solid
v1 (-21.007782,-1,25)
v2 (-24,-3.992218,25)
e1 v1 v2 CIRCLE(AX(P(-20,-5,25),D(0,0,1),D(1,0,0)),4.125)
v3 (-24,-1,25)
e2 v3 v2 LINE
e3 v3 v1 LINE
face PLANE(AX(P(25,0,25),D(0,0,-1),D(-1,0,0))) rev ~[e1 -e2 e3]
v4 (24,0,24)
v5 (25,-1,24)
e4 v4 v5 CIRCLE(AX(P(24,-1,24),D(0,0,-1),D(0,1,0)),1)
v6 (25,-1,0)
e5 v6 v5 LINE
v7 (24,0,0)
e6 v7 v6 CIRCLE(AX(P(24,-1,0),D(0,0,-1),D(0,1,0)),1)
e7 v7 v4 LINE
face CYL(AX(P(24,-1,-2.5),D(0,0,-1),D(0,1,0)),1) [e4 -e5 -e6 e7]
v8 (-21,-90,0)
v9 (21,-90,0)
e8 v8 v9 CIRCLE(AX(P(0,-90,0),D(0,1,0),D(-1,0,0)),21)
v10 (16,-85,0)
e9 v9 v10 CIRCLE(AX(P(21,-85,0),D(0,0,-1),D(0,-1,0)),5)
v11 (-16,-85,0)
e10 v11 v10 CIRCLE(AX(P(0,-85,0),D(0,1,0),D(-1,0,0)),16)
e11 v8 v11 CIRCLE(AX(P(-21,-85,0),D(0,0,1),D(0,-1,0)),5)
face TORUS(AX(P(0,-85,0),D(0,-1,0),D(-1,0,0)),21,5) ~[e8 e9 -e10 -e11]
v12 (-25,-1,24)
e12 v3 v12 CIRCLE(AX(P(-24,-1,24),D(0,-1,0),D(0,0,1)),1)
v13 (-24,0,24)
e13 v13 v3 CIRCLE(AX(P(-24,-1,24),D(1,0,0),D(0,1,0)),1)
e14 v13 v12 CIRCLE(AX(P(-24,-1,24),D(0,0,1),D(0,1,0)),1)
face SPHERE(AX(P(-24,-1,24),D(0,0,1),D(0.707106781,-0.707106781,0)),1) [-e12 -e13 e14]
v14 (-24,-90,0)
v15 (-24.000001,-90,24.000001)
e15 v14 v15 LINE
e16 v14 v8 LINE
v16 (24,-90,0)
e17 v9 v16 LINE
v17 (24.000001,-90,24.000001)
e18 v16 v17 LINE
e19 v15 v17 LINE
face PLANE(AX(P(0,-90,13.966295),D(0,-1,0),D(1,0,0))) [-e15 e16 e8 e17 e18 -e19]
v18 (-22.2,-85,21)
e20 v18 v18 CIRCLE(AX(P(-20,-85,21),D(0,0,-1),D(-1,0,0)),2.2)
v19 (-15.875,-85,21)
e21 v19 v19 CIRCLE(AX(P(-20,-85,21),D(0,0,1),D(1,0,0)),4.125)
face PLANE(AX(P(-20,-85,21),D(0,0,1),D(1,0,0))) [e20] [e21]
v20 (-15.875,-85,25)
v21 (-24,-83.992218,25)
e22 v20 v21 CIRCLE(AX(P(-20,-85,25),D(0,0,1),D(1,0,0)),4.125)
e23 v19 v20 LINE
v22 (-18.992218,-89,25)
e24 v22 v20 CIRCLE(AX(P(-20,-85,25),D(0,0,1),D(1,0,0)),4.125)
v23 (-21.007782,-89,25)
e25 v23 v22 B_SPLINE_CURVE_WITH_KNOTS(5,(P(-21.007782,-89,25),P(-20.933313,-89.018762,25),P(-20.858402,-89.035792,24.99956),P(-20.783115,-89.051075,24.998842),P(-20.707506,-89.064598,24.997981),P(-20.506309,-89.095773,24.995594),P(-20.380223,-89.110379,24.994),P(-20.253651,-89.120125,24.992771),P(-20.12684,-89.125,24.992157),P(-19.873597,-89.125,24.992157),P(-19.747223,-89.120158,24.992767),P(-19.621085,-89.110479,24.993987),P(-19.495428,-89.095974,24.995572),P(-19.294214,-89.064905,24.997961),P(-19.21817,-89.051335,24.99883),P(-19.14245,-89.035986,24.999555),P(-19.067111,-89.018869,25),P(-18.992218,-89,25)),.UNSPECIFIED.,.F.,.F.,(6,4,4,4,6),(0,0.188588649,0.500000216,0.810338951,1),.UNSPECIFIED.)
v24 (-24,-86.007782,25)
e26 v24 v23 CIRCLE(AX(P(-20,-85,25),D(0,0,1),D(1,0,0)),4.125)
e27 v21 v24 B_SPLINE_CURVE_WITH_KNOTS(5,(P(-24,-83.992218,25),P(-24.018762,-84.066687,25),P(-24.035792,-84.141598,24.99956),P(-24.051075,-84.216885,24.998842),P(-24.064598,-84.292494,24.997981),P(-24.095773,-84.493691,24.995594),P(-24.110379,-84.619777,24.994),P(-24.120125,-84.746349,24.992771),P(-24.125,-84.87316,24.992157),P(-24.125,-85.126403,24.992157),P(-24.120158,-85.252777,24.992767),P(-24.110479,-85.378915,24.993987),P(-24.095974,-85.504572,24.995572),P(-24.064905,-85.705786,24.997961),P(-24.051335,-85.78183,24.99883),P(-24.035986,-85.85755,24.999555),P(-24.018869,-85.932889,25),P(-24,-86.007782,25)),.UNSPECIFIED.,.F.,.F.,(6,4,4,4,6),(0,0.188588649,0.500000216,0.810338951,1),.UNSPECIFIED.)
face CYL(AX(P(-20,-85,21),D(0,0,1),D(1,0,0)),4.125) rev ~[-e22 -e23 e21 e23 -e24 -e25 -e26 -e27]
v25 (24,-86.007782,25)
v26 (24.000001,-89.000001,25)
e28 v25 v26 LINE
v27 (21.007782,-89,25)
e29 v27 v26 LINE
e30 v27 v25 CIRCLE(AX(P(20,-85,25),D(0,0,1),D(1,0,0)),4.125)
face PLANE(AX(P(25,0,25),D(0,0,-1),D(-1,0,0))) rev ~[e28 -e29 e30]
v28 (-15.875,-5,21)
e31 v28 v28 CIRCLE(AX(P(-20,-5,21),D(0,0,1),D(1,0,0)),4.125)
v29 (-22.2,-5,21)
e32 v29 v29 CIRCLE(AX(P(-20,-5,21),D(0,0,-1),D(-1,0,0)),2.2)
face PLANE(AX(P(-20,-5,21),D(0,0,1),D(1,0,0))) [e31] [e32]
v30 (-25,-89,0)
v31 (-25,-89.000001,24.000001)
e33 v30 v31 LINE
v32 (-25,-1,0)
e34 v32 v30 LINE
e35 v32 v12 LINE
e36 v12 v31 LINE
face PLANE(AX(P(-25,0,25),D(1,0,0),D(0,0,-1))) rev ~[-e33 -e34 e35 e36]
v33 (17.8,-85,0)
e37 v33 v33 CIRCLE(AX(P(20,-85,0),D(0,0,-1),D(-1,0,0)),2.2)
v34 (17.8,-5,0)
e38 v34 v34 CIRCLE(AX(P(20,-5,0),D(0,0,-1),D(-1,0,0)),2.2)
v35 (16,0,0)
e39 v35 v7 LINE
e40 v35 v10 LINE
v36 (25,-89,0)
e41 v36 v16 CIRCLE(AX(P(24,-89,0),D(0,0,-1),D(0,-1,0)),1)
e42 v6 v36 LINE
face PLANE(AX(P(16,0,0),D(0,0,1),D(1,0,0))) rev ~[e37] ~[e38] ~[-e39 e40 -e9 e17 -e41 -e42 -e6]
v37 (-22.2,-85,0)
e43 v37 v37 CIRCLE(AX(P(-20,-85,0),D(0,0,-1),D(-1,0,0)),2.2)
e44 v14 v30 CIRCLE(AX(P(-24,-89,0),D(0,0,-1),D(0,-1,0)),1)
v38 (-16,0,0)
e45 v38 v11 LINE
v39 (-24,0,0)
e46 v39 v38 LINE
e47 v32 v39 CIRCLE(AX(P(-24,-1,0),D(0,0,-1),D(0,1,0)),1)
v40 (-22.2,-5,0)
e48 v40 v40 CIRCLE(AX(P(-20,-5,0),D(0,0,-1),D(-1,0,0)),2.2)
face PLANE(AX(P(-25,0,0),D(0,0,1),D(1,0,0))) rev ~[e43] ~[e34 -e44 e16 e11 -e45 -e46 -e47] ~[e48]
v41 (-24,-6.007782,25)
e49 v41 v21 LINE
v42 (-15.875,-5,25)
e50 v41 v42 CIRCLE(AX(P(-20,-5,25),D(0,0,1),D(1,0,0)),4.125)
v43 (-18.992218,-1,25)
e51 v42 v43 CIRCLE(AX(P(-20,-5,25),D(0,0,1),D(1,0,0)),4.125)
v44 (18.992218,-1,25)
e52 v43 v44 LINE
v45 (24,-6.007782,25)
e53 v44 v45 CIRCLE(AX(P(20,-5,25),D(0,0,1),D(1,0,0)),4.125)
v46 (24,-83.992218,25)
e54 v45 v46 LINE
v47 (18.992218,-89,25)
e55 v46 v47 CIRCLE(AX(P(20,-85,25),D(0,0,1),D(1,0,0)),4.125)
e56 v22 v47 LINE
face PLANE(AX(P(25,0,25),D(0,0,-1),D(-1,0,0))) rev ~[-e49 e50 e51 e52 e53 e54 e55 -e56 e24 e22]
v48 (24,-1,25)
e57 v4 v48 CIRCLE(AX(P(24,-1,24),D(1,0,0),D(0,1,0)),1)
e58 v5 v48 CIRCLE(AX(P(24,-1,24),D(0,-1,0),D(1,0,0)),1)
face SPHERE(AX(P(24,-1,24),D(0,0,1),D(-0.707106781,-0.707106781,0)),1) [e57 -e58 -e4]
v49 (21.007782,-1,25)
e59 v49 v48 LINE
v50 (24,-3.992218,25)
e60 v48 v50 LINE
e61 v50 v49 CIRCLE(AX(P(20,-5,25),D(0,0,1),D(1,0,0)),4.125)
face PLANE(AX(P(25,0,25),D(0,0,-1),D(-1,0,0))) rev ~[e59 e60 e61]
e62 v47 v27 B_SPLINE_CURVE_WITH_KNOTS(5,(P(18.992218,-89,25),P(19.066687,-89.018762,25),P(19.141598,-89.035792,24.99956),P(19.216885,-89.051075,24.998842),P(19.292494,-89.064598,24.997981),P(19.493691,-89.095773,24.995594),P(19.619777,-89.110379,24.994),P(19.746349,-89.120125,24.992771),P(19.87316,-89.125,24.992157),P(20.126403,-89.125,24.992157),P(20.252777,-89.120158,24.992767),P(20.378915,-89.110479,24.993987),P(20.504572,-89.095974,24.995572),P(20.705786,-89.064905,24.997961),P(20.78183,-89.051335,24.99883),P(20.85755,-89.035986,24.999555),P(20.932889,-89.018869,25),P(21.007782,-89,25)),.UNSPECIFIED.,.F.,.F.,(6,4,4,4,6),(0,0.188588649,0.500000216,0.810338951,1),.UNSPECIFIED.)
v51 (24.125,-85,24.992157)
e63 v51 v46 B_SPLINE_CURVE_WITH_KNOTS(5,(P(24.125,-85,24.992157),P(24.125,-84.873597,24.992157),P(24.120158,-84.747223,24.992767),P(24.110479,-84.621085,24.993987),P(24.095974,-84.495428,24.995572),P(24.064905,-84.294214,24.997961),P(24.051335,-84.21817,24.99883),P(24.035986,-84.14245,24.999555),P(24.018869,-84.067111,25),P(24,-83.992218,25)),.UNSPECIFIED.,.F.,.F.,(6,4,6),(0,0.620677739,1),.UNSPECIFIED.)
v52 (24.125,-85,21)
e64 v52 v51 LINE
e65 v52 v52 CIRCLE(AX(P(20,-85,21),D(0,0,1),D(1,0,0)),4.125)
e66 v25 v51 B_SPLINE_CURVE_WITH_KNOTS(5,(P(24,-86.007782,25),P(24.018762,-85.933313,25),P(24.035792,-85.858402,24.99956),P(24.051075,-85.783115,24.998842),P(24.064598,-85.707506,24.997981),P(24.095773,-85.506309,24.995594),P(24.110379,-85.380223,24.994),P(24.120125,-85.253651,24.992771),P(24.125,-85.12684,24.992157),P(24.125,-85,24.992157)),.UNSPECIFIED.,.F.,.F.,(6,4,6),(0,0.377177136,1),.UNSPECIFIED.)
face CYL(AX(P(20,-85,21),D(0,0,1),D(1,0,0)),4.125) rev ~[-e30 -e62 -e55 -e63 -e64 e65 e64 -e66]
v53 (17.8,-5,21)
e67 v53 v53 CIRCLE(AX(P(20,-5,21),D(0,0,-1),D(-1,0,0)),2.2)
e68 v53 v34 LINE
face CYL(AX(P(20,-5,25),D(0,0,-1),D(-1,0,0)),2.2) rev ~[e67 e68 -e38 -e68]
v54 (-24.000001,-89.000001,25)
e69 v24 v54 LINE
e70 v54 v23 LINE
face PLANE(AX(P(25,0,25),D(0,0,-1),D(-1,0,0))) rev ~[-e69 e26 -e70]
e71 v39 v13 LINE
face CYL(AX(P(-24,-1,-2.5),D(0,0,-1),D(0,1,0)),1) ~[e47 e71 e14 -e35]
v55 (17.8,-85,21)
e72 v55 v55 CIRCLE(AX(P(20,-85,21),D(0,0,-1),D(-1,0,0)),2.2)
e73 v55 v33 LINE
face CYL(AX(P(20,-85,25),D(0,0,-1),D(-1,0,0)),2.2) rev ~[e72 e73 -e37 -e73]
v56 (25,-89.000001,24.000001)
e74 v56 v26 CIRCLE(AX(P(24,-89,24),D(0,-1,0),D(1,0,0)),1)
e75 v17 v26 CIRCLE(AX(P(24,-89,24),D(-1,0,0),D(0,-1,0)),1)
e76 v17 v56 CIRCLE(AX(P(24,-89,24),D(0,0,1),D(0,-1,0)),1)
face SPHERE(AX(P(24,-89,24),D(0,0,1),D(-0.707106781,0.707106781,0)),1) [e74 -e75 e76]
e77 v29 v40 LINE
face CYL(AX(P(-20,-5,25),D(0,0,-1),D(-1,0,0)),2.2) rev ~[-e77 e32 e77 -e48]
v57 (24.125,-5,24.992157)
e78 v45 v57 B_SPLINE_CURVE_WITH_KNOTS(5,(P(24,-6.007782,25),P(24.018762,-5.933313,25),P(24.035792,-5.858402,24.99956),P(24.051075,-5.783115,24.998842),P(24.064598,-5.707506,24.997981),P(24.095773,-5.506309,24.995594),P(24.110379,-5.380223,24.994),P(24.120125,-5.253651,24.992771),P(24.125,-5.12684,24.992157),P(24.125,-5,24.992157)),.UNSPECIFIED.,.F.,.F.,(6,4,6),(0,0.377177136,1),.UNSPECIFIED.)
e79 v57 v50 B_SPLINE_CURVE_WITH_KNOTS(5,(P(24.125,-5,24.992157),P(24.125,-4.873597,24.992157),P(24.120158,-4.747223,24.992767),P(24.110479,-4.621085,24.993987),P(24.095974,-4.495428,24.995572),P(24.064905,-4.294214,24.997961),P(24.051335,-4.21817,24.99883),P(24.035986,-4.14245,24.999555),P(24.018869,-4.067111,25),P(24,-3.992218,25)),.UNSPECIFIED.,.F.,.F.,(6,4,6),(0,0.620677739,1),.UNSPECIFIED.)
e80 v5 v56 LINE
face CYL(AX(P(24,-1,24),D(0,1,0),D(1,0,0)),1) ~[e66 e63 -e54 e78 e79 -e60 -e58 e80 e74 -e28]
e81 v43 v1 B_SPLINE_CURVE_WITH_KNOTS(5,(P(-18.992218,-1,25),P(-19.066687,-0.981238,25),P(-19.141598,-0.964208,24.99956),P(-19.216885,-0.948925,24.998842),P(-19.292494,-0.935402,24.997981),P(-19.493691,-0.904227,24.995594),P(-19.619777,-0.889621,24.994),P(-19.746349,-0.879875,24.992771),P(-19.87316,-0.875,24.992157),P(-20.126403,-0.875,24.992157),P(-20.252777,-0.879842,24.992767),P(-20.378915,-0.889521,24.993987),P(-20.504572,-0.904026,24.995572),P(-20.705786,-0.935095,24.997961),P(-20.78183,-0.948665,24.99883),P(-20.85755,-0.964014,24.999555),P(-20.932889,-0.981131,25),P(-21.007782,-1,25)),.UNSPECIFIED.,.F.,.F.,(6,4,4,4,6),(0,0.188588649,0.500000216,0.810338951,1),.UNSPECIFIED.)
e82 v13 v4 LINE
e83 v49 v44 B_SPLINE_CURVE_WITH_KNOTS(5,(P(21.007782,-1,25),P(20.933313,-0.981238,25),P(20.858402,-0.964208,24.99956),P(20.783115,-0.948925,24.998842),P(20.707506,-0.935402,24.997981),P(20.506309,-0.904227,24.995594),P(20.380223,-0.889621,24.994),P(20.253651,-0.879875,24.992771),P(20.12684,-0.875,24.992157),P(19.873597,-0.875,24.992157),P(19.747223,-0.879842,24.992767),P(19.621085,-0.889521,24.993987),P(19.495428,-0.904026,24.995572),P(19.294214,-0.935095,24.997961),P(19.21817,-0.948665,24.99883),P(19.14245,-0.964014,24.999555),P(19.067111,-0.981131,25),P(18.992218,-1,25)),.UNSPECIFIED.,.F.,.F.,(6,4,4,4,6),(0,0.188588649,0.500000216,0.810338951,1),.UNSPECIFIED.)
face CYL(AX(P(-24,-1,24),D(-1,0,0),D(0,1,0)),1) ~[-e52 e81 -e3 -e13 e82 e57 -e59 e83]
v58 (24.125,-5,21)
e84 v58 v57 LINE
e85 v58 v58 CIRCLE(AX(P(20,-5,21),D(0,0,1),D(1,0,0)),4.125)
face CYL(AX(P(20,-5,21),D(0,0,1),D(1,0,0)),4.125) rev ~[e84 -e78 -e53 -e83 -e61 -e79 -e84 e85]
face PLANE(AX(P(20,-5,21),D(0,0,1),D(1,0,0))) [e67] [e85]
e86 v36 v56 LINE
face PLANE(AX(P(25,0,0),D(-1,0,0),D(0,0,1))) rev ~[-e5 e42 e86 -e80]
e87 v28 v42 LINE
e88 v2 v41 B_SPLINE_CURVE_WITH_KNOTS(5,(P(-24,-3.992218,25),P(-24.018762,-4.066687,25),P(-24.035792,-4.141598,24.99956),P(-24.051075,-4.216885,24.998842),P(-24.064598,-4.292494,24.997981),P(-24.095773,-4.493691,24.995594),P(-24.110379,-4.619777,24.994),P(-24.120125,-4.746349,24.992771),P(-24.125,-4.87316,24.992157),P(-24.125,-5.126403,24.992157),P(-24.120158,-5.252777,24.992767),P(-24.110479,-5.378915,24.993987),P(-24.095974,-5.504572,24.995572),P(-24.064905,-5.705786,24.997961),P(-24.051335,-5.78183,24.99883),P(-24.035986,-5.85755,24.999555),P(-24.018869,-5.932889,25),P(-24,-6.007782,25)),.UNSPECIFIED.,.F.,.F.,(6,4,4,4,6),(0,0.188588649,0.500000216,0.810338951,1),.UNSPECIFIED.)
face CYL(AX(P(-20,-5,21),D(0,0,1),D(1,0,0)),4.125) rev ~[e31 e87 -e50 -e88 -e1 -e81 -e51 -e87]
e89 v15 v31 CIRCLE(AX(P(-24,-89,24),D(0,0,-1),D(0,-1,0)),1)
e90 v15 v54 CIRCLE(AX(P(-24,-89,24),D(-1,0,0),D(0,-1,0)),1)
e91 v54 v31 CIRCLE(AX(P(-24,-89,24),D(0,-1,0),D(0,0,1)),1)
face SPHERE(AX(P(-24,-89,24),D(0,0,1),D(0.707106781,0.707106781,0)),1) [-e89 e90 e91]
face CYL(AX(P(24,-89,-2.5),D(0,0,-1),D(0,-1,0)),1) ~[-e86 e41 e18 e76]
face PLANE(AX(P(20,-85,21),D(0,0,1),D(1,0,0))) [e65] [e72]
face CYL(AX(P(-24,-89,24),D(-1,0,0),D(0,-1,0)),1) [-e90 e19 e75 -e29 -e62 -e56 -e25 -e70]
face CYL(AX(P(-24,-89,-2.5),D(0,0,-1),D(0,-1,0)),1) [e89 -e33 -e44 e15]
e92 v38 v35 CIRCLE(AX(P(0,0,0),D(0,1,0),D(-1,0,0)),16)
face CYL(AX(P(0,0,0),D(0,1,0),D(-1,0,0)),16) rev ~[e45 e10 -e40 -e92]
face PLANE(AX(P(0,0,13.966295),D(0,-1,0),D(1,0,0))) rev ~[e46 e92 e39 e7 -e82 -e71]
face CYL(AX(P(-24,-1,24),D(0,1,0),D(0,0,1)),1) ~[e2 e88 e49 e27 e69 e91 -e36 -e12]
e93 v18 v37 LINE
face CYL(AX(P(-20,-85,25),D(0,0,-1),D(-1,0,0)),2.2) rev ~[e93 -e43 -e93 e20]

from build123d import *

# Parameters (mm, degrees)
F1_DEPTH       = 90
F3_D           = 4.4
F3_CBORE_D     = 8.25
F3_CBORE_DEPTH = 4
F4_R           = 5
F5_T1_DEPTH    = 88
F5_T3_DEPTH    = 26.5
F5_T5_DEPTH    = 48
F5_S9_W        = 1
F5_S9_H        = 1
F5_T10_DEPTH   = 1
F5_S15_W       = 1
F5_S15_H       = 1
F5_T16_DEPTH   = 1
F5_S21_W       = 1
F5_S21_H       = 1
F5_T22_DEPTH   = 1
F5_S27_W       = 1
F5_S27_H       = 1
F5_T28_DEPTH   = 1


# Not quite as in the source:
# - a fillet or chamfer that OpenCascade refuses, or shapes differently, is made with other operations: its cross-section is extruded or revolved along the edge and cut away or added


with BuildPart() as f1:
    # F0 (on Front) → F1 (new body)
    with BuildSketch(Plane.XZ):
        with BuildLine():
            Line((25, 0), (25, 25))
            Line((25, 25), (-25, 25))
            Line((-25, 25), (-25, 0))
            Line((-25, 0), (-16, 0))
            ThreePointArc((-16, 0), (0, 16), (16, 0))
            Line((16, 0), (25, 0))
        make_face()
    extrude(amount=F1_DEPTH)

    # F3 (through all)
    with Locations(Plane.XY.offset(25)):
        with Locations((-20, -85), (-20, -5), (20, -5), (20, -85)):
            CounterBoreHole(F3_D / 2, F3_CBORE_D / 2, F3_CBORE_DEPTH)

    # F4
    f4_edges = [f1.edges().sort_by_distance(p)[0] for p in [
        (0, -90, 16),
    ]]
    fillet(f4_edges, radius=F4_R)

    # F5: fillet of radius 1 on 8 edges, made by hand

    # F5_s2 → F5_t1 (cut)
    with BuildSketch(Plane.XZ.offset(1)):
        with BuildLine():
            ThreePointArc((25, 24), (24.7071067812, 24.7071067812), (24, 25))
            Line((24, 25), (25, 25))
            Line((25, 25), (25, 24))
        make_face()
        with BuildLine():
            ThreePointArc((-24, 25), (-24.7071067812, 24.7071067812), (-25, 24))
            Line((-25, 24), (-25, 25))
            Line((-25, 25), (-24, 25))
        make_face()
    extrude(amount=F5_T1_DEPTH, mode=Mode.SUBTRACT)

    # F5_s4 → F5_t3 (cut)
    with BuildSketch(Plane.XY.offset(-2.5)):
        with BuildLine():
            ThreePointArc((24, -90), (24.7071067812, -89.7071067812), (25, -89))
            Line((25, -89), (25, -90))
            Line((25, -90), (24, -90))
        make_face()
        with BuildLine():
            ThreePointArc((24, 0), (24.7071067812, -0.2928932188), (25, -1))
            Line((25, -1), (25, 0))
            Line((25, 0), (24, 0))
        make_face()
        with BuildLine():
            ThreePointArc((-24, 0), (-24.7071067812, -0.2928932188), (-25, -1))
            Line((-25, -1), (-25, 0))
            Line((-25, 0), (-24, 0))
        make_face()
        with BuildLine():
            ThreePointArc((-24, -90), (-24.7071067812, -89.7071067812), (-25, -89))
            Line((-25, -89), (-25, -90))
            Line((-25, -90), (-24, -90))
        make_face()
    extrude(amount=F5_T3_DEPTH, mode=Mode.SUBTRACT)

    # F5_s6 → F5_t5 (cut)
    with BuildSketch(Plane.YZ.offset(-24)):
        with BuildLine():
            ThreePointArc((0, 24), (-0.2928932188, 24.7071067812), (-1, 25))
            Line((-1, 25), (0, 25))
            Line((0, 25), (0, 24))
        make_face()
        with BuildLine():
            ThreePointArc((-90, 24), (-89.7071067812, 24.7071067812), (-89, 25))
            Line((-89, 25), (-90, 25))
            Line((-90, 25), (-90, 24))
        make_face()
    extrude(amount=F5_T5_DEPTH, mode=Mode.SUBTRACT)


with BuildPart() as f5_tool8:
    # F5_s9 → F5_t10 (new body)
    with BuildSketch(Plane.XY.offset(24)):
        with Locations((24.5, -0.5)):
            Rectangle(F5_S9_W, F5_S9_H)
    extrude(amount=F5_T10_DEPTH)

    # F5_s11 → F5_t12 (revolve, cut)
    with BuildSketch(Plane(origin=(24, -1, 24), x_dir=(-0.7071067812, -0.7071067812, 0), z_dir=(-0.7071067812, 0.7071067812, 0))):
        with BuildLine():
            ThreePointArc((0, -1), (1, 0), (0, 1))
            Line((0, 1), (0, -1))
        make_face()
    revolve(axis=Axis((24, -1, 24), (0, 0, 1)), mode=Mode.SUBTRACT)


with BuildPart() as f1_1:
    add(f1.part)

    # F5_t7: cut F5_tool8
    add(f5_tool8.part, mode=Mode.SUBTRACT)


with BuildPart() as f5_tool14:
    # F5_s15 → F5_t16 (new body)
    with BuildSketch(Plane.XY.offset(24)):
        with Locations((24.5, -89.5)):
            Rectangle(F5_S15_W, F5_S15_H)
    extrude(amount=F5_T16_DEPTH)

    # F5_s17 → F5_t18 (revolve, cut)
    with BuildSketch(Plane(origin=(24, -89, 24), x_dir=(-0.7071067812, 0.7071067812, 0), z_dir=(0.7071067812, 0.7071067812, 0))):
        with BuildLine():
            ThreePointArc((0, -1), (1, 0), (0, 1))
            Line((0, 1), (0, -1))
        make_face()
    revolve(axis=Axis((24, -89, 24), (0, 0, 1)), mode=Mode.SUBTRACT)


with BuildPart() as f1_2:
    add(f1_1.part)

    # F5_t13: cut F5_tool14
    add(f5_tool14.part, mode=Mode.SUBTRACT)


with BuildPart() as f5_tool20:
    # F5_s21 → F5_t22 (new body)
    with BuildSketch(Plane.XY.offset(24)):
        with Locations((-24.5, -0.5)):
            Rectangle(F5_S21_W, F5_S21_H)
    extrude(amount=F5_T22_DEPTH)

    # F5_s23 → F5_t24 (revolve, cut)
    with BuildSketch(Plane(origin=(-24, -1, 24), x_dir=(0.7071067812, -0.7071067812, 0), z_dir=(-0.7071067812, -0.7071067812, 0))):
        with BuildLine():
            ThreePointArc((0, -1), (1, 0), (0, 1))
            Line((0, 1), (0, -1))
        make_face()
    revolve(axis=Axis((-24, -1, 24), (0, 0, 1)), mode=Mode.SUBTRACT)


with BuildPart() as f1_3:
    add(f1_2.part)

    # F5_t19: cut F5_tool20
    add(f5_tool20.part, mode=Mode.SUBTRACT)


with BuildPart() as f5_tool26:
    # F5_s27 → F5_t28 (new body)
    with BuildSketch(Plane.XY.offset(24)):
        with Locations((-24.5, -89.5)):
            Rectangle(F5_S27_W, F5_S27_H)
    extrude(amount=F5_T28_DEPTH)

    # F5_s29 → F5_t30 (revolve, cut)
    with BuildSketch(Plane(origin=(-24, -89, 24), x_dir=(0.7071067812, 0.7071067812, 0), z_dir=(0.7071067812, -0.7071067812, 0))):
        with BuildLine():
            ThreePointArc((0, -1), (1, 0), (0, 1))
            Line((0, 1), (0, -1))
        make_face()
    revolve(axis=Axis((-24, -89, 24), (0, 0, 1)), mode=Mode.SUBTRACT)


with BuildPart() as f1_4:
    add(f1_3.part)

    # F5_t25: cut F5_tool26
    add(f5_tool26.part, mode=Mode.SUBTRACT)


solid = f1_4.part
